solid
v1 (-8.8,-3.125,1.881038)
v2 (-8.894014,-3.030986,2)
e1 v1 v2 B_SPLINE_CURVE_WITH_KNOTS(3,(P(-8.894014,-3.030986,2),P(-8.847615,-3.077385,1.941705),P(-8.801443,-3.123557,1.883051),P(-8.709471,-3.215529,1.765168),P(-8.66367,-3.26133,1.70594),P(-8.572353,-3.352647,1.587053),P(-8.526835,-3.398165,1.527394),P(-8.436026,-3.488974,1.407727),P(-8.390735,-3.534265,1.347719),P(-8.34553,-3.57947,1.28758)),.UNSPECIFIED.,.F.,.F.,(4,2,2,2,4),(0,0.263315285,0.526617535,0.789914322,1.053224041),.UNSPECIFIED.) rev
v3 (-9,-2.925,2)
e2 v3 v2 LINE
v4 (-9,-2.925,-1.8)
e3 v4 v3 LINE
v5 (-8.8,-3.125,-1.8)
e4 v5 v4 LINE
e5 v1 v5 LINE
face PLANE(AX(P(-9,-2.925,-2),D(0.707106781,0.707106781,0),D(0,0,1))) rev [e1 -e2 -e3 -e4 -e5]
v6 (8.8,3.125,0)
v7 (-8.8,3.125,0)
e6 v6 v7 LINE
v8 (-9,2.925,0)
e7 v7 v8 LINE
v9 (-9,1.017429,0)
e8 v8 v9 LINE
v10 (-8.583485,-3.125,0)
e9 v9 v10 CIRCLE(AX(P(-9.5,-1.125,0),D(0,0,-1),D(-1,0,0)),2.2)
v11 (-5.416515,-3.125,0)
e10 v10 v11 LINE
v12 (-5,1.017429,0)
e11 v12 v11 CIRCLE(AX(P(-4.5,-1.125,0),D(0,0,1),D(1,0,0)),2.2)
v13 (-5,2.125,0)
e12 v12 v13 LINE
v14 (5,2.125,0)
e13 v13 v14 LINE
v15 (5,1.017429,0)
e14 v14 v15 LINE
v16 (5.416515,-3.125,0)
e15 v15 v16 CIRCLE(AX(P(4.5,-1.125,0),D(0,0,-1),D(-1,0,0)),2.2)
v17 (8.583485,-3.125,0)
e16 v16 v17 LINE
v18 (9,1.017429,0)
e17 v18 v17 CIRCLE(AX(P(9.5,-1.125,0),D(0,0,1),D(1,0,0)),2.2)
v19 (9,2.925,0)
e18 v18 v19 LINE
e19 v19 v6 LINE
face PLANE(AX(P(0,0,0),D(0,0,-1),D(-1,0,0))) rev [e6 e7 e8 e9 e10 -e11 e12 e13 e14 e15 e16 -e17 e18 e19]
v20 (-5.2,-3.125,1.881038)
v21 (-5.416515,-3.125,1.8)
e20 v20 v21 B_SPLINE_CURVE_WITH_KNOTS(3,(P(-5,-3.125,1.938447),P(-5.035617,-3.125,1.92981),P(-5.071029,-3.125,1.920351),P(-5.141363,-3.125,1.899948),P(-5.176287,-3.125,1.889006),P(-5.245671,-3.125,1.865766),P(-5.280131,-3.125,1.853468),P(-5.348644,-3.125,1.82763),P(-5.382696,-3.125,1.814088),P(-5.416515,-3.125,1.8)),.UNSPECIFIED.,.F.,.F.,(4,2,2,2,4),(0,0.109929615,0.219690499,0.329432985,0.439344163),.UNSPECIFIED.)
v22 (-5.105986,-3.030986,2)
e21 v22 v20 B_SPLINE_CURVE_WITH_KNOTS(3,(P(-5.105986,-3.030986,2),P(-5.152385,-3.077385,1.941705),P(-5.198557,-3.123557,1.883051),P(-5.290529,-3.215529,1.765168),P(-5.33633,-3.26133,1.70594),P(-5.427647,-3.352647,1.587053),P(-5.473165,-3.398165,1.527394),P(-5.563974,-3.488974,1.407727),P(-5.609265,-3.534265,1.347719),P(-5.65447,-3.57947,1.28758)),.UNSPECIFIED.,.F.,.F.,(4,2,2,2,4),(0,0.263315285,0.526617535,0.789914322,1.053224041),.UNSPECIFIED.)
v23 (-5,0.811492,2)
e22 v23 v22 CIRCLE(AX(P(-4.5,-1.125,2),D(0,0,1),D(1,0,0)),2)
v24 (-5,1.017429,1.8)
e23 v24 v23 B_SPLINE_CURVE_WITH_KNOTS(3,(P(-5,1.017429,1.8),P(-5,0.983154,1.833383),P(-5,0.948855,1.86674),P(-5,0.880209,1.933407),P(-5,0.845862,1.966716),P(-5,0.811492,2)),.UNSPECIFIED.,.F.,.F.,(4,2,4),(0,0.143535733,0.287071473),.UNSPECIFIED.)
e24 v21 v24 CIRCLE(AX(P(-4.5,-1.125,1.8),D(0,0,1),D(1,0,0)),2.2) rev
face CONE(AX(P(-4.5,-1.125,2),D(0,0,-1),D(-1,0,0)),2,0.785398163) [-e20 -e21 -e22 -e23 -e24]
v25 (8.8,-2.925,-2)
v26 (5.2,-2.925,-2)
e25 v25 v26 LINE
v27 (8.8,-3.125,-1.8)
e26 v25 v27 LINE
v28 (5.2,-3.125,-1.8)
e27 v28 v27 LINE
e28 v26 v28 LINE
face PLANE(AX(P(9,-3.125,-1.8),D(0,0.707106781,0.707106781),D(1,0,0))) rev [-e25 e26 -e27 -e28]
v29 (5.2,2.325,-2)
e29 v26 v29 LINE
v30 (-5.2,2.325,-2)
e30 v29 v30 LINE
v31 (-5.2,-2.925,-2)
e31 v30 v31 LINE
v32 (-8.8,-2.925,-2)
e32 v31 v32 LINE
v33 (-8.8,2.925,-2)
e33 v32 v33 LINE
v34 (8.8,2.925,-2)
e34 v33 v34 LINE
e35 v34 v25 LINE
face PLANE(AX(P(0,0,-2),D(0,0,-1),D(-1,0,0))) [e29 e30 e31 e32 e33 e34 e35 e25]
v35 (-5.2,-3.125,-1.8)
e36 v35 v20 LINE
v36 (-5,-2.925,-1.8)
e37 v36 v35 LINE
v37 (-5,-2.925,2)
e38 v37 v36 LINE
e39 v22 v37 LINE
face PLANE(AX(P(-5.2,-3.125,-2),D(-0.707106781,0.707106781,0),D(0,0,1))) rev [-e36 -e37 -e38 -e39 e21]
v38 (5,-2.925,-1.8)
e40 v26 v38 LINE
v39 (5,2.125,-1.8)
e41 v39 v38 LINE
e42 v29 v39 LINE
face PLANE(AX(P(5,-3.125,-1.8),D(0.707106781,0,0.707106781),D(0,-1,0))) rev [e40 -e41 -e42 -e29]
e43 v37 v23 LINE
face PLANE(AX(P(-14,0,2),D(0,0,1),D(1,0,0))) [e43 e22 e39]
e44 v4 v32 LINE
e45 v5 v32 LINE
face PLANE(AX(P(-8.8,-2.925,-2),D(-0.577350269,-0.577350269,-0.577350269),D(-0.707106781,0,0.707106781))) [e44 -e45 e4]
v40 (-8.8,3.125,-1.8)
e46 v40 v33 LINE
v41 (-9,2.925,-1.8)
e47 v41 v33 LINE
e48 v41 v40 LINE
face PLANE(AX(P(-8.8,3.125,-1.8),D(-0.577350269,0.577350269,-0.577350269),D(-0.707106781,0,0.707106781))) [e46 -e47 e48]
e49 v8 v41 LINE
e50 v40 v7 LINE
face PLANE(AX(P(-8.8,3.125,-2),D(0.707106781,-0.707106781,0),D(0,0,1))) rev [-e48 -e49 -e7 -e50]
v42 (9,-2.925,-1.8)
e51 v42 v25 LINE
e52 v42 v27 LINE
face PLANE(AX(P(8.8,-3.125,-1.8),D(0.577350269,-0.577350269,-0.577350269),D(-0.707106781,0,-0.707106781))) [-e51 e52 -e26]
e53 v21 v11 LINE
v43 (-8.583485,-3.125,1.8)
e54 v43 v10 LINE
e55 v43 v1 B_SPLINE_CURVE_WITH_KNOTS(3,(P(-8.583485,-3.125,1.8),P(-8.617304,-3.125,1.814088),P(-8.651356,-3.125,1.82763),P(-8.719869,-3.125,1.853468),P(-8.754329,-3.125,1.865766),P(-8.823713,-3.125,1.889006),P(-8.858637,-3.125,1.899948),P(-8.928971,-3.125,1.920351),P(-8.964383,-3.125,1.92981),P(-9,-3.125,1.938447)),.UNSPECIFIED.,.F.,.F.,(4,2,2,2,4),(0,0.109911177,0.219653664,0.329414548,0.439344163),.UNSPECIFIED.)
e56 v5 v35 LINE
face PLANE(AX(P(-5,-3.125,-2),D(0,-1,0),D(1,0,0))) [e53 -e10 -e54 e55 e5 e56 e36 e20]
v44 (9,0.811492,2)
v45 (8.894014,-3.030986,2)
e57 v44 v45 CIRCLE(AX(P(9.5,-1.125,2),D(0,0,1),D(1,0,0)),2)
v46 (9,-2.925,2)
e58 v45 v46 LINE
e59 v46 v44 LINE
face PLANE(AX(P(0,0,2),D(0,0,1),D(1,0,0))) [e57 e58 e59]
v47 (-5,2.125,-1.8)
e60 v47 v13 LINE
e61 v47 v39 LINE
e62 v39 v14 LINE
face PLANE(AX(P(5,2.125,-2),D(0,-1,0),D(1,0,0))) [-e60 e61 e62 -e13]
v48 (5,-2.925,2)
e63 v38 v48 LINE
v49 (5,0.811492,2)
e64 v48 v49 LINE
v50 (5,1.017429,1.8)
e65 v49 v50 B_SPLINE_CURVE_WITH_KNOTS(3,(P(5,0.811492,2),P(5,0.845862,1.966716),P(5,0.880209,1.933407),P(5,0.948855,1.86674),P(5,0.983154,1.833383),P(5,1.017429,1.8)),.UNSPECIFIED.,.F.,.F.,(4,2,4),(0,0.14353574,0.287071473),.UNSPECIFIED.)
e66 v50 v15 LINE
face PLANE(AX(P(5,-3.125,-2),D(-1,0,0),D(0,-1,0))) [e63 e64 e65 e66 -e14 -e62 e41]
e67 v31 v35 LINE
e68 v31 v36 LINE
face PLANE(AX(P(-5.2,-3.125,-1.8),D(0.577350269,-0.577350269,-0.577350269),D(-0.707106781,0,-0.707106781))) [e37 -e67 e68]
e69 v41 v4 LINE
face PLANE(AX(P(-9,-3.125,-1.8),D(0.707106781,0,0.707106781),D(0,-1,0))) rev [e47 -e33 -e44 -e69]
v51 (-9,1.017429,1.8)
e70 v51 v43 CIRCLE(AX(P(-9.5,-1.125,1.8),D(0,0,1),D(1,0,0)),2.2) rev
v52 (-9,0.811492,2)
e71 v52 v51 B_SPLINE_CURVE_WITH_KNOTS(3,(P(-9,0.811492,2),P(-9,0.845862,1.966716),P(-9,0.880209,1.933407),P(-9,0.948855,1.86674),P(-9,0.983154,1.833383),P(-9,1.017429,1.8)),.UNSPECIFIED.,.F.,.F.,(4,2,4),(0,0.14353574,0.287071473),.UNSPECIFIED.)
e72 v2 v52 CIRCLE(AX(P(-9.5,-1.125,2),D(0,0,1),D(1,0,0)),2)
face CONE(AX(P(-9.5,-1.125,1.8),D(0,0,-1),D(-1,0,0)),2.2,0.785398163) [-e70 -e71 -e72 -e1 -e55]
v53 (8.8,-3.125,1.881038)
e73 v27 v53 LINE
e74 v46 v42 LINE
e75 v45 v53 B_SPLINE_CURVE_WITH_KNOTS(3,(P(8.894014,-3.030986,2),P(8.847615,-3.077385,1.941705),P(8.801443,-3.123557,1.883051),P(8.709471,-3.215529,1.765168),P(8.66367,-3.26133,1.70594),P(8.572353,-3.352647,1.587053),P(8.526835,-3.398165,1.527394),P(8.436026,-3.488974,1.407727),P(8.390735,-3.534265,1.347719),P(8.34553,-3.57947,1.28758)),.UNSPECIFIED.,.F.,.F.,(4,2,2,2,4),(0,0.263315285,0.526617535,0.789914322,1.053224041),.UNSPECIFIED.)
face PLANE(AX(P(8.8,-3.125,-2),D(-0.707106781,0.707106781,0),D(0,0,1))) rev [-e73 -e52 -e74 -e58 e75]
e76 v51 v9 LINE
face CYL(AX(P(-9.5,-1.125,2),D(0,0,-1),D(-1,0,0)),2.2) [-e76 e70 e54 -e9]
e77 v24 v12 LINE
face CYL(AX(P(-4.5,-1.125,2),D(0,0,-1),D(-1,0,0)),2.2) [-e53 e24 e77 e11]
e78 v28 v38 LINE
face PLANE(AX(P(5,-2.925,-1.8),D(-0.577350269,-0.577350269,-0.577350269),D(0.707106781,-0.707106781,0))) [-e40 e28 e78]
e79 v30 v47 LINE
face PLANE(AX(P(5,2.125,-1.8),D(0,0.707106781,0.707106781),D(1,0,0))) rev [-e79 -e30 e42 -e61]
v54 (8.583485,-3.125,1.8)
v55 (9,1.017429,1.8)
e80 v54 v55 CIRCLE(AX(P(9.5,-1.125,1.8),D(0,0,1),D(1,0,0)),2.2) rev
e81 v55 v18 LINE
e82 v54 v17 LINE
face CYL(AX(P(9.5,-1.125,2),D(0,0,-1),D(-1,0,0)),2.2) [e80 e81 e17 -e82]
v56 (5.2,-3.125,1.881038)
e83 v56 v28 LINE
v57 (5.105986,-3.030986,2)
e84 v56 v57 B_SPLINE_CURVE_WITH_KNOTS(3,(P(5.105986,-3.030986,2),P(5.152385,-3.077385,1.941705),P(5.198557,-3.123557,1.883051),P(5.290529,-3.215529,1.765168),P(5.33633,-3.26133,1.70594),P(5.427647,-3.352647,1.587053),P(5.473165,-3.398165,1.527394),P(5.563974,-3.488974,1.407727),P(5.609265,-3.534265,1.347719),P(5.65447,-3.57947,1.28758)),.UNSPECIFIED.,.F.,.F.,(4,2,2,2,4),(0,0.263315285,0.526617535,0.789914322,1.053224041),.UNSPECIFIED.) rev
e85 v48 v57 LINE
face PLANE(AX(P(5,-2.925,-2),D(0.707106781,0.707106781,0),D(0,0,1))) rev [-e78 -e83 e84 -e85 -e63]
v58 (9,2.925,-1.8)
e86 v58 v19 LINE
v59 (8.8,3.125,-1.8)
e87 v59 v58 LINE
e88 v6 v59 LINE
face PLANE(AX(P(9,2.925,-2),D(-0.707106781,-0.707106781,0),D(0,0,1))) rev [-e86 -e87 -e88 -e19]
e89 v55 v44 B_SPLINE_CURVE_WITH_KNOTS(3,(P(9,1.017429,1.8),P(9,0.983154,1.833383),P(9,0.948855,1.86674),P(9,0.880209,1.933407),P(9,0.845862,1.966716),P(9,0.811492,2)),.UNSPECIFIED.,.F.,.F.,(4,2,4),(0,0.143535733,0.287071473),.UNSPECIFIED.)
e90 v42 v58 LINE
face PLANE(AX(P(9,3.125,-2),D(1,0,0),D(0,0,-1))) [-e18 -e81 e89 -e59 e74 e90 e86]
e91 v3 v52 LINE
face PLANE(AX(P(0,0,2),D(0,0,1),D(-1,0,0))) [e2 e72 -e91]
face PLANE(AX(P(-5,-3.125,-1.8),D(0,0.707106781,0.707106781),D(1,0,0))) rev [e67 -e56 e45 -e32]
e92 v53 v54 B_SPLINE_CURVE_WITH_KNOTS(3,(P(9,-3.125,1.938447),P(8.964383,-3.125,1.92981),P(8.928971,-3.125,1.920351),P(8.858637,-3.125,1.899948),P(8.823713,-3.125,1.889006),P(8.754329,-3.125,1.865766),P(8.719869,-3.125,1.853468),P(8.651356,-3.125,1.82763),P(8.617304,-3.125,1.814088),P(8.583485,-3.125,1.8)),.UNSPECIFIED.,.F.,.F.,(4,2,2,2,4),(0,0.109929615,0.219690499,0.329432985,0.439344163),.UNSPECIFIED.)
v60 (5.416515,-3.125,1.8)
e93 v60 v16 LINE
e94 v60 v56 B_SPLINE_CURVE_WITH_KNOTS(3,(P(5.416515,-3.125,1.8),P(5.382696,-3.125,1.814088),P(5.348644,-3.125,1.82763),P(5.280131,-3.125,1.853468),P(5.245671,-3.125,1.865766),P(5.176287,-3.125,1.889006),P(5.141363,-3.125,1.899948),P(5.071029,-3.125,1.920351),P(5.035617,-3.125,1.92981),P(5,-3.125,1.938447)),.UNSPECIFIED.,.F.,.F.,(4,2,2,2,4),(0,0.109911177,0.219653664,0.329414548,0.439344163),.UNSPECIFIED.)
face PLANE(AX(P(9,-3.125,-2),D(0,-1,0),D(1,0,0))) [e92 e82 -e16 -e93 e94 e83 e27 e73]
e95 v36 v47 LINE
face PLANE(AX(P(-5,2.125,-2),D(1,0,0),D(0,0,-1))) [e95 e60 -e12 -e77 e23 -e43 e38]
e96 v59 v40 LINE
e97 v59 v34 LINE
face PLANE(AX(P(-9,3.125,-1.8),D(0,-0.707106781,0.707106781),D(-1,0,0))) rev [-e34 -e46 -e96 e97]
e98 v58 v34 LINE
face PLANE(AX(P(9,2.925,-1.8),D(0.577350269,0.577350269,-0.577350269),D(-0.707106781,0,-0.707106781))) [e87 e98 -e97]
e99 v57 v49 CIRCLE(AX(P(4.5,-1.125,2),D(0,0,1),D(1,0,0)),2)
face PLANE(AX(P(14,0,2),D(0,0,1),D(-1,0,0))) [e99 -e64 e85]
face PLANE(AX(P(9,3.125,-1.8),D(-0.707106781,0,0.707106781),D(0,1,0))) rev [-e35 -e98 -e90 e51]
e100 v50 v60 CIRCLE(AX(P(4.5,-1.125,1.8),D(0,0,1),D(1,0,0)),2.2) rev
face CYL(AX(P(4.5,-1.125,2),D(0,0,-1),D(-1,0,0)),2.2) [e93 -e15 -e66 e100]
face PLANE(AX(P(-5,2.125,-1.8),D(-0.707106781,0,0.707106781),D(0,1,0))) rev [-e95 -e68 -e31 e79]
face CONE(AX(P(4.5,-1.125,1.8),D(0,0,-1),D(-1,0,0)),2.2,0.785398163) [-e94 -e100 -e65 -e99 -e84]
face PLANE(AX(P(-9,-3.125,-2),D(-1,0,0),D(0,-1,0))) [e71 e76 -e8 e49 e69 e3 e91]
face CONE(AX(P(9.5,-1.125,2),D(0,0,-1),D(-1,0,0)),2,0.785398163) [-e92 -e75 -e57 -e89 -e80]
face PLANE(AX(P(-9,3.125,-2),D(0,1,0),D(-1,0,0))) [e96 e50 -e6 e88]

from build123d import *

# Parameters (mm, degrees)
BOSS_EXTRUDE1_DEPTH  = 2
BOSS_EXTRUDE2_DEPTH  = 2
MIRROR2_COPY_1_DEPTH = 2


with BuildPart() as part:
    # Sketch1 → Boss-Extrude1 (new body)
    with BuildSketch(Plane.XY):
        Polygon((-9, 3.125), (9, 3.125), (9, -3.125), (5, -3.125), (5, 2.125), (-5, 2.125), (-5, -3.125), (-9, -3.125), align=None)
    extrude(amount=-BOSS_EXTRUDE1_DEPTH)

    # Sketch2 → Boss-Extrude2 (add)
    with BuildSketch(Plane.XY):
        with BuildLine():
            Line((9, -3.125), (9, 1.017428529))
            ThreePointArc((9, 1.017428529), (7.311037389, -0.904903006), (8.583484861, -3.125))
            Line((8.583484861, -3.125), (9, -3.125))
        make_face()
    boss_extrude2 = extrude(amount=BOSS_EXTRUDE2_DEPTH)

    # Mirror1: Boss-Extrude2 across plane
    add(boss_extrude2.mirror(Plane(origin=(7, 0, 0), x_dir=(0, 0, 1), z_dir=(1, 0, 0))))

    # Mirror2: Boss-Extrude2 across plane
    add(boss_extrude2.mirror(Plane(origin=(0, 0, 0), x_dir=(0, 0, 1), z_dir=(1, 0, 0))))

    # Mirror2 copy 1 sketch → Mirror2 copy 1 (add)
    with BuildSketch(Plane(origin=(-14, 0, 0), x_dir=(1, 0, 0), z_dir=(0, 0, 1))):
        with BuildLine():
            Line((9, -3.125), (9, 1.017428529))
            ThreePointArc((9, 1.017428529), (7.311037389, -0.904903006), (8.583484861, -3.125))
            Line((8.583484861, -3.125), (9, -3.125))
        make_face()
    extrude(amount=MIRROR2_COPY_1_DEPTH)

    # Deburs
    # the kernel refuses this chamfer: 0.2 mm, written as the material it takes off along each edge
    with BuildSketch(Plane(origin=(-8.866666667, 2.991666667, -1.866666667), x_dir=(0, -0.7071067811865479, -0.7071067811865471), z_dir=(-0.5773502691896264, 0.5773502691896251, -0.5773502691896257)), Plane(origin=(5.133333333, -2.991666667, -1.866666667), x_dir=(0, -0.7071067811865479, 0.7071067811865471), z_dir=(-0.5773502691896256, -0.5773502691896256, -0.5773502691896262)), Plane(origin=(-8.866666667, -2.991666667, -1.866666667), x_dir=(0, -0.7071067811865479, 0.7071067811865471), z_dir=(-0.5773502691896272, -0.5773502691896246, -0.5773502691896253))) as deburs_piece_1:
        Polygon((-0.141421356, -0.081649658), (0.141421356, -0.081649658), (0, 0.163299316), align=None)
    extrude(amount=0.254034118, mode=Mode.SUBTRACT)
    with BuildSketch(Plane(origin=(8.866666667, 2.991666667, -1.866666667), x_dir=(0, -0.7071067811865479, -0.7071067811865471), z_dir=(0.5773502691896272, 0.5773502691896246, -0.5773502691896253)), Plane(origin=(8.866666667, -2.991666667, -1.866666667), x_dir=(-0.7071067811865465, 0, -0.7071067811865488), z_dir=(0.5773502691896272, -0.5773502691896246, -0.5773502691896253)), Plane(origin=(-5.133333333, -2.991666667, -1.866666667), x_dir=(3.140184917367542e-15, -0.7071067811865464, 0.7071067811865487), z_dir=(0.5773502691896256, -0.5773502691896255, -0.5773502691896262))) as deburs_piece_2:
        Polygon((-0.141421356, 0.081649658), (0.141421356, 0.081649658), (0, -0.163299316), align=None)
    extrude(amount=0.254034118, mode=Mode.SUBTRACT)
    with BuildSketch(Plane(origin=(-9.514336598, 3.125, -2), x_dir=(0, 0.02749587661058736, 0.9996219169112966), z_dir=(1, 0, 0))) as deburs_piece_3:
        with BuildLine():
            Line((0.205734639, 0), (-0.011309431, 0.205423559))
            Line((-0.011309431, 0.205423559), (-0.015307919, 0.205313575))
            ThreePointArc((-0.015307919, 0.205313575), (-0.006825845, 0.102679566), (-0.003998488, -0.000109984))
            Line((-0.003998488, -0.000109984), (0.000109984, -0.003998488))
            ThreePointArc((0.000109984, -0.003998488), (0.102899533, -0.00117113), (0.205844623, -0.003998488))
            Line((0.205844623, -0.003998488), (0.205734639, 0))
        make_face()
    extrude(amount=19.028673195, mode=Mode.SUBTRACT)
    with BuildSketch(Plane(origin=(9, 3.125, 0.514336598), x_dir=(-0.9996219169112966, 0.02749587661058742, 0), z_dir=(0, 0, -1))) as deburs_piece_4:
        with BuildLine():
            Line((0.205734639, 0), (-0.011309431, -0.205423559))
            Line((-0.011309431, -0.205423559), (-0.015307919, -0.205313575))
            ThreePointArc((-0.015307919, -0.205313575), (-0.006825845, -0.102679566), (-0.003998488, 0.000109984))
            Line((-0.003998488, 0.000109984), (0.000109984, 0.003998488))
            ThreePointArc((0.000109984, 0.003998488), (0.102899533, 0.00117113), (0.205844623, 0.003998488))
            Line((0.205844623, 0.003998488), (0.205734639, 0))
        make_face()
    extrude(amount=3.028673195, mode=Mode.SUBTRACT)
    with BuildSketch(Plane(origin=(9, 3.639336598, -2), x_dir=(-0.9996219169112966, 0, -0.02749587661058742), z_dir=(0, -1, 0)), Plane(origin=(-9, -3.639336598, -2), x_dir=(0.9996219169112966, 0, -0.02749587661058742), z_dir=(0, 1, 0))) as deburs_piece_5:
        with BuildLine():
            Line((0.205734639, 0), (-0.011309431, -0.205423559))
            Line((-0.011309431, -0.205423559), (-0.015307919, -0.205313575))
            ThreePointArc((-0.015307919, -0.205313575), (-0.006825845, -0.102679566), (-0.003998488, 0.000109984))
            Line((-0.003998488, 0.000109984), (0.000109984, 0.003998488))
            ThreePointArc((0.000109984, 0.003998488), (0.102899533, 0.00117113), (0.205844623, 0.003998488))
            Line((0.205844623, 0.003998488), (0.205734639, 0))
        make_face()
    extrude(amount=7.278673195, mode=Mode.SUBTRACT)
    with BuildSketch(Plane(origin=(9, -3.125, 2.514336598), x_dir=(-0.9996219169112966, -0.02749587661058742, 0), z_dir=(0, 0, -1)), Plane(origin=(5, -3.125, 2.514336598), x_dir=(-0.027495876610587302, 0.9996219169112966, 0), z_dir=(0, 0, -1)), Plane(origin=(-9, -3.125, -2.514336598), x_dir=(0.9996219169112966, -0.02749587661058742, -1.3226059551012301e-15), z_dir=(0, 0, 1))) as deburs_piece_6:
        with BuildLine():
            Line((0.205734639, 0), (-0.011309431, 0.205423559))
            Line((-0.011309431, 0.205423559), (-0.015307919, 0.205313575))
            ThreePointArc((-0.015307919, 0.205313575), (-0.006825845, 0.102679566), (-0.003998488, -0.000109984))
            Line((-0.003998488, -0.000109984), (0.000109984, -0.003998488))
            ThreePointArc((0.000109984, -0.003998488), (0.102899533, -0.00117113), (0.205844623, -0.003998488))
            Line((0.205844623, -0.003998488), (0.205734639, 0))
        make_face()
    extrude(amount=5.028673195, mode=Mode.SUBTRACT)
    with BuildSketch(Plane(origin=(9.514336598, -3.125, -2), x_dir=(0, 0.9996219169112966, -0.027495876610587302), z_dir=(-1, 0, 0)), Plane(origin=(-5, -3.125, -2.514336598), x_dir=(-0.9996219169112966, -0.027495876610587302, 4.0013970761285496e-15), z_dir=(0, 0, 1)), Plane(origin=(-4.485663402, -3.125, -2), x_dir=(0, 0.9996219169112966, -0.027495876610587302), z_dir=(-1, 0, 0))) as deburs_piece_7:
        with BuildLine():
            Line((0.205734639, 0), (-0.011309431, -0.205423559))
            Line((-0.011309431, -0.205423559), (-0.015307919, -0.205313575))
            ThreePointArc((-0.015307919, -0.205313575), (-0.006825845, -0.102679566), (-0.003998488, 0.000109984))
            Line((-0.003998488, 0.000109984), (0.000109984, 0.003998488))
            ThreePointArc((0.000109984, 0.003998488), (0.102899533, 0.00117113), (0.205844623, 0.003998488))
            Line((0.205844623, 0.003998488), (0.205734639, 0))
        make_face()
    extrude(amount=5.028673195, mode=Mode.SUBTRACT)
    with BuildSketch(Plane(origin=(5, -3.639336598, -2), x_dir=(0.9996219169112966, 0, -0.027495876610587302), z_dir=(0, 1, 0)), Plane(origin=(-5, 2.125, -2), x_dir=(-0.9996219169112966, 0, -0.027495876610587302), z_dir=(0, -1, 0))) as deburs_piece_8:
        with BuildLine():
            Line((0.205734639, 0), (-0.011309431, -0.205423559))
            Line((-0.011309431, -0.205423559), (-0.015307919, -0.205313575))
            ThreePointArc((-0.015307919, -0.205313575), (-0.006825845, -0.102679566), (-0.003998488, 0.000109984))
            Line((-0.003998488, 0.000109984), (0.000109984, 0.003998488))
            ThreePointArc((0.000109984, 0.003998488), (0.102899533, 0.00117113), (0.205844623, 0.003998488))
            Line((0.205844623, 0.003998488), (0.205734639, 0))
        make_face()
    extrude(amount=5.764336598, mode=Mode.SUBTRACT)
    with BuildSketch(Plane(origin=(5, 2.125, -2), x_dir=(0, 0.9996219169112966, -0.027495876610587302), z_dir=(-1, 0, 0))) as deburs_piece_9:
        with BuildLine():
            Line((0.205734639, 0), (-0.011309431, -0.205423559))
            Line((-0.011309431, -0.205423559), (-0.015307919, -0.205313575))
            ThreePointArc((-0.015307919, -0.205313575), (-0.006825845, -0.102679566), (-0.003998488, 0.000109984))
            Line((-0.003998488, 0.000109984), (0.000109984, 0.003998488))
            ThreePointArc((0.000109984, 0.003998488), (0.102899533, 0.00117113), (0.205844623, 0.003998488))
            Line((0.205844623, 0.003998488), (0.205734639, 0))
        make_face()
    extrude(amount=10, mode=Mode.SUBTRACT)
    with BuildSketch(Plane(origin=(-9, 3.125, 0.514336598), x_dir=(0.9996219169112966, 0.02749587661058742, 0), z_dir=(0, 0, -1))) as deburs_piece_10:
        with BuildLine():
            Line((0.205734639, 0), (-0.011309431, 0.205423559))
            Line((-0.011309431, 0.205423559), (-0.015307919, 0.205313575))
            ThreePointArc((-0.015307919, 0.205313575), (-0.006825845, 0.102679566), (-0.003998488, -0.000109984))
            Line((-0.003998488, -0.000109984), (0.000109984, -0.003998488))
            ThreePointArc((0.000109984, -0.003998488), (0.102899533, -0.00117113), (0.205844623, -0.003998488))
            Line((0.205844623, -0.003998488), (0.205734639, 0))
        make_face()
    extrude(amount=3.028673195, mode=Mode.SUBTRACT)
    with BuildSketch(Plane(origin=(9.5, -1.125, 2), x_dir=(0.004747833317757314, 0.9999887289758754, 0), z_dir=(0.9999887289758754, -0.004747833317757314, 0))) as deburs_piece_11:
        with BuildLine():
            Line((1.994343146, 0.005656854), (2.205656854, -0.205656854))
            Line((2.205656854, -0.205656854), (2.209656854, -0.205656854))
            ThreePointArc((2.209656854, -0.205656854), (2.204, -0.102828427), (2.204, 0))
            Line((2.204, 0), (2.2, 0.004))
            ThreePointArc((2.2, 0.004), (2.097171573, 0.004), (1.994343146, 0.009656854))
            Line((1.994343146, 0.009656854), (1.994343146, 0.005656854))
        make_face()
    revolve(axis=Axis((9.5, -1.125, 2), (0, 0, 1)), revolution_arc=169.060645124, mode=Mode.SUBTRACT)
    with BuildSketch(Plane(origin=(4.5, -1.125, 2), x_dir=(-0.004747833317757314, 0.9999887289758754, 0), z_dir=(-0.9999887289758754, -0.004747833317757314, 0))) as deburs_piece_12:
        with BuildLine():
            Line((1.994343146, -0.005656854), (2.205656854, 0.205656854))
            Line((2.205656854, 0.205656854), (2.209656854, 0.205656854))
            ThreePointArc((2.209656854, 0.205656854), (2.204, 0.102828427), (2.204, 0))
            Line((2.204, 0), (2.2, -0.004))
            ThreePointArc((2.2, -0.004), (2.097171573, -0.004), (1.994343146, -0.009656854))
            Line((1.994343146, -0.009656854), (1.994343146, -0.005656854))
        make_face()
    revolve(axis=Axis((4.5, -1.125, 2), (0, 0, -1)), revolution_arc=169.060645124, mode=Mode.SUBTRACT)
    with BuildSketch(Plane(origin=(-4.5, -1.125, 2), x_dir=(0.004747833317757314, 0.9999887289758754, 0), z_dir=(0.9999887289758754, -0.004747833317757314, 0))) as deburs_piece_13:
        with BuildLine():
            Line((1.994343146, 0.005656854), (2.205656854, -0.205656854))
            Line((2.205656854, -0.205656854), (2.209656854, -0.205656854))
            ThreePointArc((2.209656854, -0.205656854), (2.204, -0.102828427), (2.204, 0))
            Line((2.204, 0), (2.2, 0.004))
            ThreePointArc((2.2, 0.004), (2.097171573, 0.004), (1.994343146, 0.009656854))
            Line((1.994343146, 0.009656854), (1.994343146, 0.005656854))
        make_face()
    revolve(axis=Axis((-4.5, -1.125, 2), (0, 0, 1)), revolution_arc=169.060645124, mode=Mode.SUBTRACT)
    with BuildSketch(Plane(origin=(-9.5, -1.125, 2), x_dir=(-0.004747833317757314, 0.9999887289758754, 0), z_dir=(-0.9999887289758754, -0.004747833317757314, 0))) as deburs_piece_14:
        with BuildLine():
            Line((2.205656854, 0.205656854), (1.994343146, -0.005656854))
            Line((1.994343146, -0.005656854), (1.994343146, -0.009656854))
            ThreePointArc((1.994343146, -0.009656854), (2.097171573, -0.004), (2.2, -0.004))
            Line((2.2, -0.004), (2.204, 0))
            ThreePointArc((2.204, 0), (2.204, 0.102828427), (2.209656854, 0.205656854))
            Line((2.209656854, 0.205656854), (2.205656854, 0.205656854))
        make_face()
    revolve(axis=Axis((-9.5, -1.125, 2), (0, 0, -1)), revolution_arc=169.060645124, mode=Mode.SUBTRACT)
    with BuildSketch(Plane(origin=(5, -3.639336598, -2), x_dir=(0.9996219169112966, 0, -0.027495876610587302), z_dir=(0, 1, 0))) as deburs_piece_15a_section:
        with BuildLine():
            Line((0.205734639, 0), (-0.011309431, -0.205423559))
            Line((-0.011309431, -0.205423559), (-0.015307919, -0.205313575))
            ThreePointArc((-0.015307919, -0.205313575), (-0.006825845, -0.102679566), (-0.003998488, 0.000109984))
            Line((-0.003998488, 0.000109984), (0.000109984, 0.003998488))
            ThreePointArc((0.000109984, 0.003998488), (0.102899533, 0.00117113), (0.205844623, 0.003998488))
            Line((0.205844623, 0.003998488), (0.205734639, 0))
        make_face()
    deburs_piece_15a = extrude(amount=6.278673195, mode=Mode.PRIVATE)
    deburs_piece_15a = split(deburs_piece_15a, bisect_by=Plane(origin=(5.065958725, 2.125, -1.934041275), z_dir=(0, 1, 0)), keep=Keep.TOP, mode=Mode.PRIVATE)
    with BuildSketch(Plane(origin=(5.514336598, 2.125, -2), x_dir=(0, 0.9996219169112966, -0.027495876610587302), z_dir=(-1, 0, 0))) as deburs_piece_15b_section:
        with BuildLine():
            Line((0.205734639, 0), (-0.011309431, -0.205423559))
            Line((-0.011309431, -0.205423559), (-0.015307919, -0.205313575))
            ThreePointArc((-0.015307919, -0.205313575), (-0.006825845, -0.102679566), (-0.003998488, 0.000109984))
            Line((-0.003998488, 0.000109984), (0.000109984, 0.003998488))
            ThreePointArc((0.000109984, 0.003998488), (0.102899533, 0.00117113), (0.205844623, 0.003998488))
            Line((0.205844623, 0.003998488), (0.205734639, 0))
        make_face()
    deburs_piece_15b = extrude(amount=10.514336598, mode=Mode.PRIVATE)
    deburs_piece_15b = split(deburs_piece_15b, bisect_by=Plane(origin=(5, 2.190958725, -1.934041275), z_dir=(1, 0, 0)), keep=Keep.TOP, mode=Mode.PRIVATE)
    deburs_piece_15 = deburs_piece_15a & deburs_piece_15b
    add(deburs_piece_15, mode=Mode.SUBTRACT)
    with BuildSketch(Plane(origin=(5, 2.125, -2), x_dir=(0, 0.9996219169112966, -0.027495876610587302), z_dir=(-1, 0, 0))) as deburs_piece_16a_section:
        with BuildLine():
            Line((0.205734639, 0), (-0.011309431, -0.205423559))
            Line((-0.011309431, -0.205423559), (-0.015307919, -0.205313575))
            ThreePointArc((-0.015307919, -0.205313575), (-0.006825845, -0.102679566), (-0.003998488, 0.000109984))
            Line((-0.003998488, 0.000109984), (0.000109984, 0.003998488))
            ThreePointArc((0.000109984, 0.003998488), (0.102899533, 0.00117113), (0.205844623, 0.003998488))
            Line((0.205844623, 0.003998488), (0.205734639, 0))
        make_face()
    deburs_piece_16a = extrude(amount=10.514336598, mode=Mode.PRIVATE)
    deburs_piece_16a = split(deburs_piece_16a, bisect_by=Plane(origin=(-5, 2.190958725, -1.934041275), z_dir=(-1, 0, 0)), keep=Keep.TOP, mode=Mode.PRIVATE)
    with BuildSketch(Plane(origin=(-5, 2.639336598, -2), x_dir=(-0.9996219169112966, 0, -0.027495876610587302), z_dir=(0, -1, 0))) as deburs_piece_16b_section:
        with BuildLine():
            Line((0.205734639, 0), (-0.011309431, -0.205423559))
            Line((-0.011309431, -0.205423559), (-0.015307919, -0.205313575))
            ThreePointArc((-0.015307919, -0.205313575), (-0.006825845, -0.102679566), (-0.003998488, 0.000109984))
            Line((-0.003998488, 0.000109984), (0.000109984, 0.003998488))
            ThreePointArc((0.000109984, 0.003998488), (0.102899533, 0.00117113), (0.205844623, 0.003998488))
            Line((0.205844623, 0.003998488), (0.205734639, 0))
        make_face()
    deburs_piece_16b = extrude(amount=6.278673195, mode=Mode.PRIVATE)
    deburs_piece_16b = split(deburs_piece_16b, bisect_by=Plane(origin=(-5.065958725, 2.125, -1.934041275), z_dir=(0, 1, 0)), keep=Keep.TOP, mode=Mode.PRIVATE)
    deburs_piece_16 = deburs_piece_16a & deburs_piece_16b
    add(deburs_piece_16, mode=Mode.SUBTRACT)


solid = part.part
